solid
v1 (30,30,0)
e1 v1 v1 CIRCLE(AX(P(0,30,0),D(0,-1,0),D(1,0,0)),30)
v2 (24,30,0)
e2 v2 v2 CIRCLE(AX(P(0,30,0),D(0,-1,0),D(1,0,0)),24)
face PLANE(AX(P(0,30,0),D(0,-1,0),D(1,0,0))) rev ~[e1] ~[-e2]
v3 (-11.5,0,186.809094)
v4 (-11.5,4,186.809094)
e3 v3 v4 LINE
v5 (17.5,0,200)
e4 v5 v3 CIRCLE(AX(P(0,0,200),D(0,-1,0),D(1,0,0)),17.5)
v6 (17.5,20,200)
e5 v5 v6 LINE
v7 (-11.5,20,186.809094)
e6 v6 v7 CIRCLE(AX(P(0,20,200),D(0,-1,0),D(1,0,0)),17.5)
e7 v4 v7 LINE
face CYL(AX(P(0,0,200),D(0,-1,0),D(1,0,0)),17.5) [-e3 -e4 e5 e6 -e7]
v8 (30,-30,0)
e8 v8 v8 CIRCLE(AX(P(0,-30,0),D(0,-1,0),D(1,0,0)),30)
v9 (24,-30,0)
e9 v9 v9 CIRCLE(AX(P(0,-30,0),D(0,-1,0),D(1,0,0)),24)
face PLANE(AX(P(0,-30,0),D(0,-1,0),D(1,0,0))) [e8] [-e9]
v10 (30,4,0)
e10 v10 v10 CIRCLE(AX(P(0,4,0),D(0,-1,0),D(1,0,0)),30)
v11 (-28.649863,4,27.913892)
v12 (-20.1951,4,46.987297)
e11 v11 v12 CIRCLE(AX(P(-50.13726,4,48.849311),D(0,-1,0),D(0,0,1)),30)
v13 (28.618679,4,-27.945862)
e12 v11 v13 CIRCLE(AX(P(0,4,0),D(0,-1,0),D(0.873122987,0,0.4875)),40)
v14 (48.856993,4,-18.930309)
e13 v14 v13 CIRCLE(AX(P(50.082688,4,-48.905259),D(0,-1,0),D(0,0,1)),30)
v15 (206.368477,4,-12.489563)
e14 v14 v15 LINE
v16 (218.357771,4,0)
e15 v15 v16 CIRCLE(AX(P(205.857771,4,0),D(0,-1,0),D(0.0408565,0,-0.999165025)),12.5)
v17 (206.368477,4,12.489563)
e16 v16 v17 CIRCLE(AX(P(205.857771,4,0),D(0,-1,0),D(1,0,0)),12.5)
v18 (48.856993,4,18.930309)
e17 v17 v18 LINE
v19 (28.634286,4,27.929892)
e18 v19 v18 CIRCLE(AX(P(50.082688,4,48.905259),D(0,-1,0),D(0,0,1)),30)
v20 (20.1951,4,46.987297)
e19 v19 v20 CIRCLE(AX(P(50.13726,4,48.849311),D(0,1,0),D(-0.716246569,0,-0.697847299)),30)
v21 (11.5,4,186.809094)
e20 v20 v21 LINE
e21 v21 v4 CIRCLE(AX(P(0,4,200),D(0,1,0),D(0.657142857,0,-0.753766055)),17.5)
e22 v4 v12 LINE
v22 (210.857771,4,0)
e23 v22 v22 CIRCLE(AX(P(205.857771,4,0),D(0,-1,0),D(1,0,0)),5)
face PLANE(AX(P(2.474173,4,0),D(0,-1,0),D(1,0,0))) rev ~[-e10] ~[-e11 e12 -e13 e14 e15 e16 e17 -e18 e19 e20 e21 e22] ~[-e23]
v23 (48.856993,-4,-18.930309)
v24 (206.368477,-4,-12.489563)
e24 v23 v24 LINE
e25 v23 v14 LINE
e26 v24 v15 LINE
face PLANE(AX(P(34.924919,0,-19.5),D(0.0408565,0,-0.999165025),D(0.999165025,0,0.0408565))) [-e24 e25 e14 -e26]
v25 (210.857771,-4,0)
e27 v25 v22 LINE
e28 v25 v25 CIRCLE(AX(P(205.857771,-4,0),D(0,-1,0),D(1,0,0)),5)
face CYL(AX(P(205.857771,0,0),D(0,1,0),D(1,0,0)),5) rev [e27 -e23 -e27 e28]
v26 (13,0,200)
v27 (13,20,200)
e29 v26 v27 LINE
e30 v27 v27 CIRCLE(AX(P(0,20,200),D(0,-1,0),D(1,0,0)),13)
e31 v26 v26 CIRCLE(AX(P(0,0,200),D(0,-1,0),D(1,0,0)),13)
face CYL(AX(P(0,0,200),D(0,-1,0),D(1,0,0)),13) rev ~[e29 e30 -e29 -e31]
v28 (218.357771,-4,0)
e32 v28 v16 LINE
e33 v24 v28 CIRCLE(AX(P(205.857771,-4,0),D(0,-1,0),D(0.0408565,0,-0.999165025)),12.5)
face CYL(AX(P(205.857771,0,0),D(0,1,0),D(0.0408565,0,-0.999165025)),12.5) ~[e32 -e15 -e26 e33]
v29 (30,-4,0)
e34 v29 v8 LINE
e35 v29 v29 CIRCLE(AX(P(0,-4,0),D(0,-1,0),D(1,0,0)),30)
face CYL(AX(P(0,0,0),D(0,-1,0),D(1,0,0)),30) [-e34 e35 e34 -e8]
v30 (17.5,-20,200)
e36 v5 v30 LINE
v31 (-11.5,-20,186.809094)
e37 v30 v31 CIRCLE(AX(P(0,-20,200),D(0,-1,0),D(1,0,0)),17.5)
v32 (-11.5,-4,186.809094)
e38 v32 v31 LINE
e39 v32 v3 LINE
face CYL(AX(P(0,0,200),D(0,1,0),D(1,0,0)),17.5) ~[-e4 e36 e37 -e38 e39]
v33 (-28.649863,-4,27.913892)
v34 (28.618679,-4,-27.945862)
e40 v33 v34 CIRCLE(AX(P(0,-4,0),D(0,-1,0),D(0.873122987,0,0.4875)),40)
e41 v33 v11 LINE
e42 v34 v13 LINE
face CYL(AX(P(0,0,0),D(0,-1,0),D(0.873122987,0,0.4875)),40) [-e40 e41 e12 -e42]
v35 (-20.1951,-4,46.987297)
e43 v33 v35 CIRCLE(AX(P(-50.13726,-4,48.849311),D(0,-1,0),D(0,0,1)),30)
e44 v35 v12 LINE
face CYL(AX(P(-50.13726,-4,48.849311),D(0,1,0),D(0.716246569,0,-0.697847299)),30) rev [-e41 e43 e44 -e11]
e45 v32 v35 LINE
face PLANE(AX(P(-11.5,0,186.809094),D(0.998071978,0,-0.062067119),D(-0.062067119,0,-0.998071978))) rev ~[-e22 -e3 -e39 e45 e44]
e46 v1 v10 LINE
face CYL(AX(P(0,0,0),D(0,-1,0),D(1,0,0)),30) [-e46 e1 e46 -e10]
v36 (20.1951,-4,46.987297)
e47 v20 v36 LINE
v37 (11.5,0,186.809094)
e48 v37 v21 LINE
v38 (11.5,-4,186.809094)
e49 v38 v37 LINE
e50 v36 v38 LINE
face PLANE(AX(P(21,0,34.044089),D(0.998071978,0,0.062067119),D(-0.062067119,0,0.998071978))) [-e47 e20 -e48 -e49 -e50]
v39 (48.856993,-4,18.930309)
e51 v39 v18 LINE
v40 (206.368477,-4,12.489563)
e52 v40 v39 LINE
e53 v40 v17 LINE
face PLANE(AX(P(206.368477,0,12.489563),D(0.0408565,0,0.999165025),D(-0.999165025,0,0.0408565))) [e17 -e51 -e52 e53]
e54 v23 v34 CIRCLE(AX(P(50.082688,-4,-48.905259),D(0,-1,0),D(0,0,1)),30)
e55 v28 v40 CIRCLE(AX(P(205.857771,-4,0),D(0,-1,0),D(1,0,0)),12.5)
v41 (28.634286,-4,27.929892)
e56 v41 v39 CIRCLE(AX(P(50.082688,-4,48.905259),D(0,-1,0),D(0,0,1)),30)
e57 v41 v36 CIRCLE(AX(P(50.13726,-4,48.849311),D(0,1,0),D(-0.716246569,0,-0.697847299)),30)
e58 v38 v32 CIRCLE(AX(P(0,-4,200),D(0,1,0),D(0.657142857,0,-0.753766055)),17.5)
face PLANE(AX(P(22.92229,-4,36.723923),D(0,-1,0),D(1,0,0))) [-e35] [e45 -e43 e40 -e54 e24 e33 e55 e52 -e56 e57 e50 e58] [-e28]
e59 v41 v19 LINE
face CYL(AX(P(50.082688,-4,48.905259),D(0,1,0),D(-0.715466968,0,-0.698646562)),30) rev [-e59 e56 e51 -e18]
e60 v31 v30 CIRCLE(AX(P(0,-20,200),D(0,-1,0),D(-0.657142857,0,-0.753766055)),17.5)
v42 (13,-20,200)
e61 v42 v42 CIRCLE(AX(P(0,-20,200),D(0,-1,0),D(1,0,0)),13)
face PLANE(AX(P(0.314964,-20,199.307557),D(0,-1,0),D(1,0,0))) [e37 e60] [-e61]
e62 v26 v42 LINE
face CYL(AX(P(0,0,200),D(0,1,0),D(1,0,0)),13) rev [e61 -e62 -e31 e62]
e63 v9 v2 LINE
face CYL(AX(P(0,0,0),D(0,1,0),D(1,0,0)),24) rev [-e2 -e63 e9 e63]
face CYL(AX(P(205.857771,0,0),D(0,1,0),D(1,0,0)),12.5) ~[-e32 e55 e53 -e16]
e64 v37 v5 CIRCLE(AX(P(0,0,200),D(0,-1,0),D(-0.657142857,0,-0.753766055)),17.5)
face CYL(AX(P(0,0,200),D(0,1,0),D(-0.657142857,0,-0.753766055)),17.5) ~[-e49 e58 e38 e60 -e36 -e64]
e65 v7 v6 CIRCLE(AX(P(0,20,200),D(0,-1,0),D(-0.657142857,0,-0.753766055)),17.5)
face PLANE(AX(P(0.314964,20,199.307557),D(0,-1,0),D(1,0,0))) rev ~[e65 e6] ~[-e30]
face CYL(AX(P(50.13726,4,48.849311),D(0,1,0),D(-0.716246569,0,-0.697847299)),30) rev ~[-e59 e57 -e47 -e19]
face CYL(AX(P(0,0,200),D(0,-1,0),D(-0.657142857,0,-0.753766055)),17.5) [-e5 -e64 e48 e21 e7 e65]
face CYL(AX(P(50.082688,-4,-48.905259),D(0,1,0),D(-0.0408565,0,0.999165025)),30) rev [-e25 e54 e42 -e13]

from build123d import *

# Parameters (mm, degrees)
F0_R        = 30
F0_R_2      = 5
F1_DEPTH    = 4
F2_R        = 30
F3_R        = 30
F4_T1_DEPTH = 8
F5_R        = 30
F5_R_2      = 24
F6_DEPTH    = 30
F0_R_3      = 13
F7_DEPTH    = 20


# Not quite as in the source:
# - a fillet or chamfer that OpenCascade refuses, or shapes differently, is made with other operations: its cross-section is extruded or revolved along the edge and cut away or added


with BuildPart() as f1:
    # F0 (on Front) → F1 (new body, symmetric)
    with BuildSketch(Plane.XZ):
        with BuildLine():
            ThreePointArc((34.9249194702, -19.5), (38.7104428986, -10.074800772), (40, 0))
            ThreePointArc((40, 0), (38.7104428986, 10.074800772), (34.9249194702, 19.5))
            ThreePointArc((34.9249194702, 19.5), (28.892590505, 27.6625778609), (21, 34.0440890611))
            ThreePointArc((21, 34.0440890611), (0, 40), (-21, 34.0440890611))
            ThreePointArc((-21, 34.0440890611), (-27.6625778609, -28.892590505), (34.9249194702, -19.5))
        make_face()
        Circle(F0_R, mode=Mode.SUBTRACT)
        with BuildLine():
            ThreePointArc((34.9249194702, 19.5), (38.7104428986, 10.074800772), (40, 0))
            ThreePointArc((40, 0), (38.7104428986, -10.074800772), (34.9249194702, -19.5))
            Line((34.9249194702, -19.5), (206.3684774144, -12.4895628079))
            ThreePointArc((206.3684774144, -12.4895628079), (193.3577711699, 0), (206.3684774144, 12.4895628079))
            Line((206.3684774144, 12.4895628079), (34.9249194702, 19.5))
        make_face()
        with BuildLine():
            ThreePointArc((218.3577711699, 0), (214.8753603171, 8.6563898926), (206.3684774144, 12.4895628079))
            ThreePointArc((206.3684774144, 12.4895628079), (193.3577711699, 0), (206.3684774144, -12.4895628079))
            ThreePointArc((206.3684774144, -12.4895628079), (214.8753603171, -8.6563898926), (218.3577711699, 0))
        make_face()
        with Locations((205.8577711699, 0)):
            Circle(F0_R_2, mode=Mode.SUBTRACT)
        with BuildLine():
            ThreePointArc((-21, 34.0440890611), (0, 40), (21, 34.0440890611))
            Line((21, 34.0440890611), (11.5, 186.8090940417))
            ThreePointArc((11.5, 186.8090940417), (0, 182.5), (-11.5, 186.8090940417))
            Line((-11.5, 186.8090940417), (-21, 34.0440890611))
        make_face()
    extrude(amount=F1_DEPTH, both=True)

    # F2
    f2_edges = [f1.edges().sort_by_distance(p)[0] for p in [
        (-21, 0, 34.044089),
        (34.924919, 0, -19.5),
    ]]
    fillet(f2_edges, radius=F2_R)

    # F3
    f3_edges = [f1.edges().sort_by_distance(p)[0] for p in [
        (34.924919, 0, 19.5),
    ]]
    fillet(f3_edges, radius=F3_R)

    # F4: fillet of radius 30 on 1 edges, made by hand

    # F4_s2 → F4_t1 (join)
    with BuildSketch(Plane.XZ.offset(-4)):
        with BuildLine():
            ThreePointArc((28.649862751, 27.9138919599), (22.7110220839, 36.6919475661), (20.1951004828, 46.9872973509))
            Line((20.1951004828, 46.9872973509), (21, 34.0440890611))
            ThreePointArc((21, 34.0440890611), (25.0134373272, 31.2142267736), (28.649862751, 27.9138919599))
        make_face()
    extrude(amount=F4_T1_DEPTH)

    # F5 (on Front) → F6 (join, symmetric)
    with BuildSketch(Plane.XZ):
        Circle(F5_R)
        Circle(F5_R_2, mode=Mode.SUBTRACT)
    extrude(amount=F6_DEPTH, both=True)

    # F0 (on Front) → F7 (join, symmetric)
    with BuildSketch(Plane.XZ):
        with BuildLine():
            ThreePointArc((-11.5, 186.8090940417), (0, 182.5), (11.5, 186.8090940417))
            ThreePointArc((11.5, 186.8090940417), (15.9295323221, 192.7543116269), (17.5, 200))
            ThreePointArc((17.5, 200), (-7.2456883731, 215.9295323221), (-11.5, 186.8090940417))
        make_face()
        with Locations((0, 200)):
            Circle(F0_R_3, mode=Mode.SUBTRACT)
    extrude(amount=F7_DEPTH, both=True)


solid = f1.part
